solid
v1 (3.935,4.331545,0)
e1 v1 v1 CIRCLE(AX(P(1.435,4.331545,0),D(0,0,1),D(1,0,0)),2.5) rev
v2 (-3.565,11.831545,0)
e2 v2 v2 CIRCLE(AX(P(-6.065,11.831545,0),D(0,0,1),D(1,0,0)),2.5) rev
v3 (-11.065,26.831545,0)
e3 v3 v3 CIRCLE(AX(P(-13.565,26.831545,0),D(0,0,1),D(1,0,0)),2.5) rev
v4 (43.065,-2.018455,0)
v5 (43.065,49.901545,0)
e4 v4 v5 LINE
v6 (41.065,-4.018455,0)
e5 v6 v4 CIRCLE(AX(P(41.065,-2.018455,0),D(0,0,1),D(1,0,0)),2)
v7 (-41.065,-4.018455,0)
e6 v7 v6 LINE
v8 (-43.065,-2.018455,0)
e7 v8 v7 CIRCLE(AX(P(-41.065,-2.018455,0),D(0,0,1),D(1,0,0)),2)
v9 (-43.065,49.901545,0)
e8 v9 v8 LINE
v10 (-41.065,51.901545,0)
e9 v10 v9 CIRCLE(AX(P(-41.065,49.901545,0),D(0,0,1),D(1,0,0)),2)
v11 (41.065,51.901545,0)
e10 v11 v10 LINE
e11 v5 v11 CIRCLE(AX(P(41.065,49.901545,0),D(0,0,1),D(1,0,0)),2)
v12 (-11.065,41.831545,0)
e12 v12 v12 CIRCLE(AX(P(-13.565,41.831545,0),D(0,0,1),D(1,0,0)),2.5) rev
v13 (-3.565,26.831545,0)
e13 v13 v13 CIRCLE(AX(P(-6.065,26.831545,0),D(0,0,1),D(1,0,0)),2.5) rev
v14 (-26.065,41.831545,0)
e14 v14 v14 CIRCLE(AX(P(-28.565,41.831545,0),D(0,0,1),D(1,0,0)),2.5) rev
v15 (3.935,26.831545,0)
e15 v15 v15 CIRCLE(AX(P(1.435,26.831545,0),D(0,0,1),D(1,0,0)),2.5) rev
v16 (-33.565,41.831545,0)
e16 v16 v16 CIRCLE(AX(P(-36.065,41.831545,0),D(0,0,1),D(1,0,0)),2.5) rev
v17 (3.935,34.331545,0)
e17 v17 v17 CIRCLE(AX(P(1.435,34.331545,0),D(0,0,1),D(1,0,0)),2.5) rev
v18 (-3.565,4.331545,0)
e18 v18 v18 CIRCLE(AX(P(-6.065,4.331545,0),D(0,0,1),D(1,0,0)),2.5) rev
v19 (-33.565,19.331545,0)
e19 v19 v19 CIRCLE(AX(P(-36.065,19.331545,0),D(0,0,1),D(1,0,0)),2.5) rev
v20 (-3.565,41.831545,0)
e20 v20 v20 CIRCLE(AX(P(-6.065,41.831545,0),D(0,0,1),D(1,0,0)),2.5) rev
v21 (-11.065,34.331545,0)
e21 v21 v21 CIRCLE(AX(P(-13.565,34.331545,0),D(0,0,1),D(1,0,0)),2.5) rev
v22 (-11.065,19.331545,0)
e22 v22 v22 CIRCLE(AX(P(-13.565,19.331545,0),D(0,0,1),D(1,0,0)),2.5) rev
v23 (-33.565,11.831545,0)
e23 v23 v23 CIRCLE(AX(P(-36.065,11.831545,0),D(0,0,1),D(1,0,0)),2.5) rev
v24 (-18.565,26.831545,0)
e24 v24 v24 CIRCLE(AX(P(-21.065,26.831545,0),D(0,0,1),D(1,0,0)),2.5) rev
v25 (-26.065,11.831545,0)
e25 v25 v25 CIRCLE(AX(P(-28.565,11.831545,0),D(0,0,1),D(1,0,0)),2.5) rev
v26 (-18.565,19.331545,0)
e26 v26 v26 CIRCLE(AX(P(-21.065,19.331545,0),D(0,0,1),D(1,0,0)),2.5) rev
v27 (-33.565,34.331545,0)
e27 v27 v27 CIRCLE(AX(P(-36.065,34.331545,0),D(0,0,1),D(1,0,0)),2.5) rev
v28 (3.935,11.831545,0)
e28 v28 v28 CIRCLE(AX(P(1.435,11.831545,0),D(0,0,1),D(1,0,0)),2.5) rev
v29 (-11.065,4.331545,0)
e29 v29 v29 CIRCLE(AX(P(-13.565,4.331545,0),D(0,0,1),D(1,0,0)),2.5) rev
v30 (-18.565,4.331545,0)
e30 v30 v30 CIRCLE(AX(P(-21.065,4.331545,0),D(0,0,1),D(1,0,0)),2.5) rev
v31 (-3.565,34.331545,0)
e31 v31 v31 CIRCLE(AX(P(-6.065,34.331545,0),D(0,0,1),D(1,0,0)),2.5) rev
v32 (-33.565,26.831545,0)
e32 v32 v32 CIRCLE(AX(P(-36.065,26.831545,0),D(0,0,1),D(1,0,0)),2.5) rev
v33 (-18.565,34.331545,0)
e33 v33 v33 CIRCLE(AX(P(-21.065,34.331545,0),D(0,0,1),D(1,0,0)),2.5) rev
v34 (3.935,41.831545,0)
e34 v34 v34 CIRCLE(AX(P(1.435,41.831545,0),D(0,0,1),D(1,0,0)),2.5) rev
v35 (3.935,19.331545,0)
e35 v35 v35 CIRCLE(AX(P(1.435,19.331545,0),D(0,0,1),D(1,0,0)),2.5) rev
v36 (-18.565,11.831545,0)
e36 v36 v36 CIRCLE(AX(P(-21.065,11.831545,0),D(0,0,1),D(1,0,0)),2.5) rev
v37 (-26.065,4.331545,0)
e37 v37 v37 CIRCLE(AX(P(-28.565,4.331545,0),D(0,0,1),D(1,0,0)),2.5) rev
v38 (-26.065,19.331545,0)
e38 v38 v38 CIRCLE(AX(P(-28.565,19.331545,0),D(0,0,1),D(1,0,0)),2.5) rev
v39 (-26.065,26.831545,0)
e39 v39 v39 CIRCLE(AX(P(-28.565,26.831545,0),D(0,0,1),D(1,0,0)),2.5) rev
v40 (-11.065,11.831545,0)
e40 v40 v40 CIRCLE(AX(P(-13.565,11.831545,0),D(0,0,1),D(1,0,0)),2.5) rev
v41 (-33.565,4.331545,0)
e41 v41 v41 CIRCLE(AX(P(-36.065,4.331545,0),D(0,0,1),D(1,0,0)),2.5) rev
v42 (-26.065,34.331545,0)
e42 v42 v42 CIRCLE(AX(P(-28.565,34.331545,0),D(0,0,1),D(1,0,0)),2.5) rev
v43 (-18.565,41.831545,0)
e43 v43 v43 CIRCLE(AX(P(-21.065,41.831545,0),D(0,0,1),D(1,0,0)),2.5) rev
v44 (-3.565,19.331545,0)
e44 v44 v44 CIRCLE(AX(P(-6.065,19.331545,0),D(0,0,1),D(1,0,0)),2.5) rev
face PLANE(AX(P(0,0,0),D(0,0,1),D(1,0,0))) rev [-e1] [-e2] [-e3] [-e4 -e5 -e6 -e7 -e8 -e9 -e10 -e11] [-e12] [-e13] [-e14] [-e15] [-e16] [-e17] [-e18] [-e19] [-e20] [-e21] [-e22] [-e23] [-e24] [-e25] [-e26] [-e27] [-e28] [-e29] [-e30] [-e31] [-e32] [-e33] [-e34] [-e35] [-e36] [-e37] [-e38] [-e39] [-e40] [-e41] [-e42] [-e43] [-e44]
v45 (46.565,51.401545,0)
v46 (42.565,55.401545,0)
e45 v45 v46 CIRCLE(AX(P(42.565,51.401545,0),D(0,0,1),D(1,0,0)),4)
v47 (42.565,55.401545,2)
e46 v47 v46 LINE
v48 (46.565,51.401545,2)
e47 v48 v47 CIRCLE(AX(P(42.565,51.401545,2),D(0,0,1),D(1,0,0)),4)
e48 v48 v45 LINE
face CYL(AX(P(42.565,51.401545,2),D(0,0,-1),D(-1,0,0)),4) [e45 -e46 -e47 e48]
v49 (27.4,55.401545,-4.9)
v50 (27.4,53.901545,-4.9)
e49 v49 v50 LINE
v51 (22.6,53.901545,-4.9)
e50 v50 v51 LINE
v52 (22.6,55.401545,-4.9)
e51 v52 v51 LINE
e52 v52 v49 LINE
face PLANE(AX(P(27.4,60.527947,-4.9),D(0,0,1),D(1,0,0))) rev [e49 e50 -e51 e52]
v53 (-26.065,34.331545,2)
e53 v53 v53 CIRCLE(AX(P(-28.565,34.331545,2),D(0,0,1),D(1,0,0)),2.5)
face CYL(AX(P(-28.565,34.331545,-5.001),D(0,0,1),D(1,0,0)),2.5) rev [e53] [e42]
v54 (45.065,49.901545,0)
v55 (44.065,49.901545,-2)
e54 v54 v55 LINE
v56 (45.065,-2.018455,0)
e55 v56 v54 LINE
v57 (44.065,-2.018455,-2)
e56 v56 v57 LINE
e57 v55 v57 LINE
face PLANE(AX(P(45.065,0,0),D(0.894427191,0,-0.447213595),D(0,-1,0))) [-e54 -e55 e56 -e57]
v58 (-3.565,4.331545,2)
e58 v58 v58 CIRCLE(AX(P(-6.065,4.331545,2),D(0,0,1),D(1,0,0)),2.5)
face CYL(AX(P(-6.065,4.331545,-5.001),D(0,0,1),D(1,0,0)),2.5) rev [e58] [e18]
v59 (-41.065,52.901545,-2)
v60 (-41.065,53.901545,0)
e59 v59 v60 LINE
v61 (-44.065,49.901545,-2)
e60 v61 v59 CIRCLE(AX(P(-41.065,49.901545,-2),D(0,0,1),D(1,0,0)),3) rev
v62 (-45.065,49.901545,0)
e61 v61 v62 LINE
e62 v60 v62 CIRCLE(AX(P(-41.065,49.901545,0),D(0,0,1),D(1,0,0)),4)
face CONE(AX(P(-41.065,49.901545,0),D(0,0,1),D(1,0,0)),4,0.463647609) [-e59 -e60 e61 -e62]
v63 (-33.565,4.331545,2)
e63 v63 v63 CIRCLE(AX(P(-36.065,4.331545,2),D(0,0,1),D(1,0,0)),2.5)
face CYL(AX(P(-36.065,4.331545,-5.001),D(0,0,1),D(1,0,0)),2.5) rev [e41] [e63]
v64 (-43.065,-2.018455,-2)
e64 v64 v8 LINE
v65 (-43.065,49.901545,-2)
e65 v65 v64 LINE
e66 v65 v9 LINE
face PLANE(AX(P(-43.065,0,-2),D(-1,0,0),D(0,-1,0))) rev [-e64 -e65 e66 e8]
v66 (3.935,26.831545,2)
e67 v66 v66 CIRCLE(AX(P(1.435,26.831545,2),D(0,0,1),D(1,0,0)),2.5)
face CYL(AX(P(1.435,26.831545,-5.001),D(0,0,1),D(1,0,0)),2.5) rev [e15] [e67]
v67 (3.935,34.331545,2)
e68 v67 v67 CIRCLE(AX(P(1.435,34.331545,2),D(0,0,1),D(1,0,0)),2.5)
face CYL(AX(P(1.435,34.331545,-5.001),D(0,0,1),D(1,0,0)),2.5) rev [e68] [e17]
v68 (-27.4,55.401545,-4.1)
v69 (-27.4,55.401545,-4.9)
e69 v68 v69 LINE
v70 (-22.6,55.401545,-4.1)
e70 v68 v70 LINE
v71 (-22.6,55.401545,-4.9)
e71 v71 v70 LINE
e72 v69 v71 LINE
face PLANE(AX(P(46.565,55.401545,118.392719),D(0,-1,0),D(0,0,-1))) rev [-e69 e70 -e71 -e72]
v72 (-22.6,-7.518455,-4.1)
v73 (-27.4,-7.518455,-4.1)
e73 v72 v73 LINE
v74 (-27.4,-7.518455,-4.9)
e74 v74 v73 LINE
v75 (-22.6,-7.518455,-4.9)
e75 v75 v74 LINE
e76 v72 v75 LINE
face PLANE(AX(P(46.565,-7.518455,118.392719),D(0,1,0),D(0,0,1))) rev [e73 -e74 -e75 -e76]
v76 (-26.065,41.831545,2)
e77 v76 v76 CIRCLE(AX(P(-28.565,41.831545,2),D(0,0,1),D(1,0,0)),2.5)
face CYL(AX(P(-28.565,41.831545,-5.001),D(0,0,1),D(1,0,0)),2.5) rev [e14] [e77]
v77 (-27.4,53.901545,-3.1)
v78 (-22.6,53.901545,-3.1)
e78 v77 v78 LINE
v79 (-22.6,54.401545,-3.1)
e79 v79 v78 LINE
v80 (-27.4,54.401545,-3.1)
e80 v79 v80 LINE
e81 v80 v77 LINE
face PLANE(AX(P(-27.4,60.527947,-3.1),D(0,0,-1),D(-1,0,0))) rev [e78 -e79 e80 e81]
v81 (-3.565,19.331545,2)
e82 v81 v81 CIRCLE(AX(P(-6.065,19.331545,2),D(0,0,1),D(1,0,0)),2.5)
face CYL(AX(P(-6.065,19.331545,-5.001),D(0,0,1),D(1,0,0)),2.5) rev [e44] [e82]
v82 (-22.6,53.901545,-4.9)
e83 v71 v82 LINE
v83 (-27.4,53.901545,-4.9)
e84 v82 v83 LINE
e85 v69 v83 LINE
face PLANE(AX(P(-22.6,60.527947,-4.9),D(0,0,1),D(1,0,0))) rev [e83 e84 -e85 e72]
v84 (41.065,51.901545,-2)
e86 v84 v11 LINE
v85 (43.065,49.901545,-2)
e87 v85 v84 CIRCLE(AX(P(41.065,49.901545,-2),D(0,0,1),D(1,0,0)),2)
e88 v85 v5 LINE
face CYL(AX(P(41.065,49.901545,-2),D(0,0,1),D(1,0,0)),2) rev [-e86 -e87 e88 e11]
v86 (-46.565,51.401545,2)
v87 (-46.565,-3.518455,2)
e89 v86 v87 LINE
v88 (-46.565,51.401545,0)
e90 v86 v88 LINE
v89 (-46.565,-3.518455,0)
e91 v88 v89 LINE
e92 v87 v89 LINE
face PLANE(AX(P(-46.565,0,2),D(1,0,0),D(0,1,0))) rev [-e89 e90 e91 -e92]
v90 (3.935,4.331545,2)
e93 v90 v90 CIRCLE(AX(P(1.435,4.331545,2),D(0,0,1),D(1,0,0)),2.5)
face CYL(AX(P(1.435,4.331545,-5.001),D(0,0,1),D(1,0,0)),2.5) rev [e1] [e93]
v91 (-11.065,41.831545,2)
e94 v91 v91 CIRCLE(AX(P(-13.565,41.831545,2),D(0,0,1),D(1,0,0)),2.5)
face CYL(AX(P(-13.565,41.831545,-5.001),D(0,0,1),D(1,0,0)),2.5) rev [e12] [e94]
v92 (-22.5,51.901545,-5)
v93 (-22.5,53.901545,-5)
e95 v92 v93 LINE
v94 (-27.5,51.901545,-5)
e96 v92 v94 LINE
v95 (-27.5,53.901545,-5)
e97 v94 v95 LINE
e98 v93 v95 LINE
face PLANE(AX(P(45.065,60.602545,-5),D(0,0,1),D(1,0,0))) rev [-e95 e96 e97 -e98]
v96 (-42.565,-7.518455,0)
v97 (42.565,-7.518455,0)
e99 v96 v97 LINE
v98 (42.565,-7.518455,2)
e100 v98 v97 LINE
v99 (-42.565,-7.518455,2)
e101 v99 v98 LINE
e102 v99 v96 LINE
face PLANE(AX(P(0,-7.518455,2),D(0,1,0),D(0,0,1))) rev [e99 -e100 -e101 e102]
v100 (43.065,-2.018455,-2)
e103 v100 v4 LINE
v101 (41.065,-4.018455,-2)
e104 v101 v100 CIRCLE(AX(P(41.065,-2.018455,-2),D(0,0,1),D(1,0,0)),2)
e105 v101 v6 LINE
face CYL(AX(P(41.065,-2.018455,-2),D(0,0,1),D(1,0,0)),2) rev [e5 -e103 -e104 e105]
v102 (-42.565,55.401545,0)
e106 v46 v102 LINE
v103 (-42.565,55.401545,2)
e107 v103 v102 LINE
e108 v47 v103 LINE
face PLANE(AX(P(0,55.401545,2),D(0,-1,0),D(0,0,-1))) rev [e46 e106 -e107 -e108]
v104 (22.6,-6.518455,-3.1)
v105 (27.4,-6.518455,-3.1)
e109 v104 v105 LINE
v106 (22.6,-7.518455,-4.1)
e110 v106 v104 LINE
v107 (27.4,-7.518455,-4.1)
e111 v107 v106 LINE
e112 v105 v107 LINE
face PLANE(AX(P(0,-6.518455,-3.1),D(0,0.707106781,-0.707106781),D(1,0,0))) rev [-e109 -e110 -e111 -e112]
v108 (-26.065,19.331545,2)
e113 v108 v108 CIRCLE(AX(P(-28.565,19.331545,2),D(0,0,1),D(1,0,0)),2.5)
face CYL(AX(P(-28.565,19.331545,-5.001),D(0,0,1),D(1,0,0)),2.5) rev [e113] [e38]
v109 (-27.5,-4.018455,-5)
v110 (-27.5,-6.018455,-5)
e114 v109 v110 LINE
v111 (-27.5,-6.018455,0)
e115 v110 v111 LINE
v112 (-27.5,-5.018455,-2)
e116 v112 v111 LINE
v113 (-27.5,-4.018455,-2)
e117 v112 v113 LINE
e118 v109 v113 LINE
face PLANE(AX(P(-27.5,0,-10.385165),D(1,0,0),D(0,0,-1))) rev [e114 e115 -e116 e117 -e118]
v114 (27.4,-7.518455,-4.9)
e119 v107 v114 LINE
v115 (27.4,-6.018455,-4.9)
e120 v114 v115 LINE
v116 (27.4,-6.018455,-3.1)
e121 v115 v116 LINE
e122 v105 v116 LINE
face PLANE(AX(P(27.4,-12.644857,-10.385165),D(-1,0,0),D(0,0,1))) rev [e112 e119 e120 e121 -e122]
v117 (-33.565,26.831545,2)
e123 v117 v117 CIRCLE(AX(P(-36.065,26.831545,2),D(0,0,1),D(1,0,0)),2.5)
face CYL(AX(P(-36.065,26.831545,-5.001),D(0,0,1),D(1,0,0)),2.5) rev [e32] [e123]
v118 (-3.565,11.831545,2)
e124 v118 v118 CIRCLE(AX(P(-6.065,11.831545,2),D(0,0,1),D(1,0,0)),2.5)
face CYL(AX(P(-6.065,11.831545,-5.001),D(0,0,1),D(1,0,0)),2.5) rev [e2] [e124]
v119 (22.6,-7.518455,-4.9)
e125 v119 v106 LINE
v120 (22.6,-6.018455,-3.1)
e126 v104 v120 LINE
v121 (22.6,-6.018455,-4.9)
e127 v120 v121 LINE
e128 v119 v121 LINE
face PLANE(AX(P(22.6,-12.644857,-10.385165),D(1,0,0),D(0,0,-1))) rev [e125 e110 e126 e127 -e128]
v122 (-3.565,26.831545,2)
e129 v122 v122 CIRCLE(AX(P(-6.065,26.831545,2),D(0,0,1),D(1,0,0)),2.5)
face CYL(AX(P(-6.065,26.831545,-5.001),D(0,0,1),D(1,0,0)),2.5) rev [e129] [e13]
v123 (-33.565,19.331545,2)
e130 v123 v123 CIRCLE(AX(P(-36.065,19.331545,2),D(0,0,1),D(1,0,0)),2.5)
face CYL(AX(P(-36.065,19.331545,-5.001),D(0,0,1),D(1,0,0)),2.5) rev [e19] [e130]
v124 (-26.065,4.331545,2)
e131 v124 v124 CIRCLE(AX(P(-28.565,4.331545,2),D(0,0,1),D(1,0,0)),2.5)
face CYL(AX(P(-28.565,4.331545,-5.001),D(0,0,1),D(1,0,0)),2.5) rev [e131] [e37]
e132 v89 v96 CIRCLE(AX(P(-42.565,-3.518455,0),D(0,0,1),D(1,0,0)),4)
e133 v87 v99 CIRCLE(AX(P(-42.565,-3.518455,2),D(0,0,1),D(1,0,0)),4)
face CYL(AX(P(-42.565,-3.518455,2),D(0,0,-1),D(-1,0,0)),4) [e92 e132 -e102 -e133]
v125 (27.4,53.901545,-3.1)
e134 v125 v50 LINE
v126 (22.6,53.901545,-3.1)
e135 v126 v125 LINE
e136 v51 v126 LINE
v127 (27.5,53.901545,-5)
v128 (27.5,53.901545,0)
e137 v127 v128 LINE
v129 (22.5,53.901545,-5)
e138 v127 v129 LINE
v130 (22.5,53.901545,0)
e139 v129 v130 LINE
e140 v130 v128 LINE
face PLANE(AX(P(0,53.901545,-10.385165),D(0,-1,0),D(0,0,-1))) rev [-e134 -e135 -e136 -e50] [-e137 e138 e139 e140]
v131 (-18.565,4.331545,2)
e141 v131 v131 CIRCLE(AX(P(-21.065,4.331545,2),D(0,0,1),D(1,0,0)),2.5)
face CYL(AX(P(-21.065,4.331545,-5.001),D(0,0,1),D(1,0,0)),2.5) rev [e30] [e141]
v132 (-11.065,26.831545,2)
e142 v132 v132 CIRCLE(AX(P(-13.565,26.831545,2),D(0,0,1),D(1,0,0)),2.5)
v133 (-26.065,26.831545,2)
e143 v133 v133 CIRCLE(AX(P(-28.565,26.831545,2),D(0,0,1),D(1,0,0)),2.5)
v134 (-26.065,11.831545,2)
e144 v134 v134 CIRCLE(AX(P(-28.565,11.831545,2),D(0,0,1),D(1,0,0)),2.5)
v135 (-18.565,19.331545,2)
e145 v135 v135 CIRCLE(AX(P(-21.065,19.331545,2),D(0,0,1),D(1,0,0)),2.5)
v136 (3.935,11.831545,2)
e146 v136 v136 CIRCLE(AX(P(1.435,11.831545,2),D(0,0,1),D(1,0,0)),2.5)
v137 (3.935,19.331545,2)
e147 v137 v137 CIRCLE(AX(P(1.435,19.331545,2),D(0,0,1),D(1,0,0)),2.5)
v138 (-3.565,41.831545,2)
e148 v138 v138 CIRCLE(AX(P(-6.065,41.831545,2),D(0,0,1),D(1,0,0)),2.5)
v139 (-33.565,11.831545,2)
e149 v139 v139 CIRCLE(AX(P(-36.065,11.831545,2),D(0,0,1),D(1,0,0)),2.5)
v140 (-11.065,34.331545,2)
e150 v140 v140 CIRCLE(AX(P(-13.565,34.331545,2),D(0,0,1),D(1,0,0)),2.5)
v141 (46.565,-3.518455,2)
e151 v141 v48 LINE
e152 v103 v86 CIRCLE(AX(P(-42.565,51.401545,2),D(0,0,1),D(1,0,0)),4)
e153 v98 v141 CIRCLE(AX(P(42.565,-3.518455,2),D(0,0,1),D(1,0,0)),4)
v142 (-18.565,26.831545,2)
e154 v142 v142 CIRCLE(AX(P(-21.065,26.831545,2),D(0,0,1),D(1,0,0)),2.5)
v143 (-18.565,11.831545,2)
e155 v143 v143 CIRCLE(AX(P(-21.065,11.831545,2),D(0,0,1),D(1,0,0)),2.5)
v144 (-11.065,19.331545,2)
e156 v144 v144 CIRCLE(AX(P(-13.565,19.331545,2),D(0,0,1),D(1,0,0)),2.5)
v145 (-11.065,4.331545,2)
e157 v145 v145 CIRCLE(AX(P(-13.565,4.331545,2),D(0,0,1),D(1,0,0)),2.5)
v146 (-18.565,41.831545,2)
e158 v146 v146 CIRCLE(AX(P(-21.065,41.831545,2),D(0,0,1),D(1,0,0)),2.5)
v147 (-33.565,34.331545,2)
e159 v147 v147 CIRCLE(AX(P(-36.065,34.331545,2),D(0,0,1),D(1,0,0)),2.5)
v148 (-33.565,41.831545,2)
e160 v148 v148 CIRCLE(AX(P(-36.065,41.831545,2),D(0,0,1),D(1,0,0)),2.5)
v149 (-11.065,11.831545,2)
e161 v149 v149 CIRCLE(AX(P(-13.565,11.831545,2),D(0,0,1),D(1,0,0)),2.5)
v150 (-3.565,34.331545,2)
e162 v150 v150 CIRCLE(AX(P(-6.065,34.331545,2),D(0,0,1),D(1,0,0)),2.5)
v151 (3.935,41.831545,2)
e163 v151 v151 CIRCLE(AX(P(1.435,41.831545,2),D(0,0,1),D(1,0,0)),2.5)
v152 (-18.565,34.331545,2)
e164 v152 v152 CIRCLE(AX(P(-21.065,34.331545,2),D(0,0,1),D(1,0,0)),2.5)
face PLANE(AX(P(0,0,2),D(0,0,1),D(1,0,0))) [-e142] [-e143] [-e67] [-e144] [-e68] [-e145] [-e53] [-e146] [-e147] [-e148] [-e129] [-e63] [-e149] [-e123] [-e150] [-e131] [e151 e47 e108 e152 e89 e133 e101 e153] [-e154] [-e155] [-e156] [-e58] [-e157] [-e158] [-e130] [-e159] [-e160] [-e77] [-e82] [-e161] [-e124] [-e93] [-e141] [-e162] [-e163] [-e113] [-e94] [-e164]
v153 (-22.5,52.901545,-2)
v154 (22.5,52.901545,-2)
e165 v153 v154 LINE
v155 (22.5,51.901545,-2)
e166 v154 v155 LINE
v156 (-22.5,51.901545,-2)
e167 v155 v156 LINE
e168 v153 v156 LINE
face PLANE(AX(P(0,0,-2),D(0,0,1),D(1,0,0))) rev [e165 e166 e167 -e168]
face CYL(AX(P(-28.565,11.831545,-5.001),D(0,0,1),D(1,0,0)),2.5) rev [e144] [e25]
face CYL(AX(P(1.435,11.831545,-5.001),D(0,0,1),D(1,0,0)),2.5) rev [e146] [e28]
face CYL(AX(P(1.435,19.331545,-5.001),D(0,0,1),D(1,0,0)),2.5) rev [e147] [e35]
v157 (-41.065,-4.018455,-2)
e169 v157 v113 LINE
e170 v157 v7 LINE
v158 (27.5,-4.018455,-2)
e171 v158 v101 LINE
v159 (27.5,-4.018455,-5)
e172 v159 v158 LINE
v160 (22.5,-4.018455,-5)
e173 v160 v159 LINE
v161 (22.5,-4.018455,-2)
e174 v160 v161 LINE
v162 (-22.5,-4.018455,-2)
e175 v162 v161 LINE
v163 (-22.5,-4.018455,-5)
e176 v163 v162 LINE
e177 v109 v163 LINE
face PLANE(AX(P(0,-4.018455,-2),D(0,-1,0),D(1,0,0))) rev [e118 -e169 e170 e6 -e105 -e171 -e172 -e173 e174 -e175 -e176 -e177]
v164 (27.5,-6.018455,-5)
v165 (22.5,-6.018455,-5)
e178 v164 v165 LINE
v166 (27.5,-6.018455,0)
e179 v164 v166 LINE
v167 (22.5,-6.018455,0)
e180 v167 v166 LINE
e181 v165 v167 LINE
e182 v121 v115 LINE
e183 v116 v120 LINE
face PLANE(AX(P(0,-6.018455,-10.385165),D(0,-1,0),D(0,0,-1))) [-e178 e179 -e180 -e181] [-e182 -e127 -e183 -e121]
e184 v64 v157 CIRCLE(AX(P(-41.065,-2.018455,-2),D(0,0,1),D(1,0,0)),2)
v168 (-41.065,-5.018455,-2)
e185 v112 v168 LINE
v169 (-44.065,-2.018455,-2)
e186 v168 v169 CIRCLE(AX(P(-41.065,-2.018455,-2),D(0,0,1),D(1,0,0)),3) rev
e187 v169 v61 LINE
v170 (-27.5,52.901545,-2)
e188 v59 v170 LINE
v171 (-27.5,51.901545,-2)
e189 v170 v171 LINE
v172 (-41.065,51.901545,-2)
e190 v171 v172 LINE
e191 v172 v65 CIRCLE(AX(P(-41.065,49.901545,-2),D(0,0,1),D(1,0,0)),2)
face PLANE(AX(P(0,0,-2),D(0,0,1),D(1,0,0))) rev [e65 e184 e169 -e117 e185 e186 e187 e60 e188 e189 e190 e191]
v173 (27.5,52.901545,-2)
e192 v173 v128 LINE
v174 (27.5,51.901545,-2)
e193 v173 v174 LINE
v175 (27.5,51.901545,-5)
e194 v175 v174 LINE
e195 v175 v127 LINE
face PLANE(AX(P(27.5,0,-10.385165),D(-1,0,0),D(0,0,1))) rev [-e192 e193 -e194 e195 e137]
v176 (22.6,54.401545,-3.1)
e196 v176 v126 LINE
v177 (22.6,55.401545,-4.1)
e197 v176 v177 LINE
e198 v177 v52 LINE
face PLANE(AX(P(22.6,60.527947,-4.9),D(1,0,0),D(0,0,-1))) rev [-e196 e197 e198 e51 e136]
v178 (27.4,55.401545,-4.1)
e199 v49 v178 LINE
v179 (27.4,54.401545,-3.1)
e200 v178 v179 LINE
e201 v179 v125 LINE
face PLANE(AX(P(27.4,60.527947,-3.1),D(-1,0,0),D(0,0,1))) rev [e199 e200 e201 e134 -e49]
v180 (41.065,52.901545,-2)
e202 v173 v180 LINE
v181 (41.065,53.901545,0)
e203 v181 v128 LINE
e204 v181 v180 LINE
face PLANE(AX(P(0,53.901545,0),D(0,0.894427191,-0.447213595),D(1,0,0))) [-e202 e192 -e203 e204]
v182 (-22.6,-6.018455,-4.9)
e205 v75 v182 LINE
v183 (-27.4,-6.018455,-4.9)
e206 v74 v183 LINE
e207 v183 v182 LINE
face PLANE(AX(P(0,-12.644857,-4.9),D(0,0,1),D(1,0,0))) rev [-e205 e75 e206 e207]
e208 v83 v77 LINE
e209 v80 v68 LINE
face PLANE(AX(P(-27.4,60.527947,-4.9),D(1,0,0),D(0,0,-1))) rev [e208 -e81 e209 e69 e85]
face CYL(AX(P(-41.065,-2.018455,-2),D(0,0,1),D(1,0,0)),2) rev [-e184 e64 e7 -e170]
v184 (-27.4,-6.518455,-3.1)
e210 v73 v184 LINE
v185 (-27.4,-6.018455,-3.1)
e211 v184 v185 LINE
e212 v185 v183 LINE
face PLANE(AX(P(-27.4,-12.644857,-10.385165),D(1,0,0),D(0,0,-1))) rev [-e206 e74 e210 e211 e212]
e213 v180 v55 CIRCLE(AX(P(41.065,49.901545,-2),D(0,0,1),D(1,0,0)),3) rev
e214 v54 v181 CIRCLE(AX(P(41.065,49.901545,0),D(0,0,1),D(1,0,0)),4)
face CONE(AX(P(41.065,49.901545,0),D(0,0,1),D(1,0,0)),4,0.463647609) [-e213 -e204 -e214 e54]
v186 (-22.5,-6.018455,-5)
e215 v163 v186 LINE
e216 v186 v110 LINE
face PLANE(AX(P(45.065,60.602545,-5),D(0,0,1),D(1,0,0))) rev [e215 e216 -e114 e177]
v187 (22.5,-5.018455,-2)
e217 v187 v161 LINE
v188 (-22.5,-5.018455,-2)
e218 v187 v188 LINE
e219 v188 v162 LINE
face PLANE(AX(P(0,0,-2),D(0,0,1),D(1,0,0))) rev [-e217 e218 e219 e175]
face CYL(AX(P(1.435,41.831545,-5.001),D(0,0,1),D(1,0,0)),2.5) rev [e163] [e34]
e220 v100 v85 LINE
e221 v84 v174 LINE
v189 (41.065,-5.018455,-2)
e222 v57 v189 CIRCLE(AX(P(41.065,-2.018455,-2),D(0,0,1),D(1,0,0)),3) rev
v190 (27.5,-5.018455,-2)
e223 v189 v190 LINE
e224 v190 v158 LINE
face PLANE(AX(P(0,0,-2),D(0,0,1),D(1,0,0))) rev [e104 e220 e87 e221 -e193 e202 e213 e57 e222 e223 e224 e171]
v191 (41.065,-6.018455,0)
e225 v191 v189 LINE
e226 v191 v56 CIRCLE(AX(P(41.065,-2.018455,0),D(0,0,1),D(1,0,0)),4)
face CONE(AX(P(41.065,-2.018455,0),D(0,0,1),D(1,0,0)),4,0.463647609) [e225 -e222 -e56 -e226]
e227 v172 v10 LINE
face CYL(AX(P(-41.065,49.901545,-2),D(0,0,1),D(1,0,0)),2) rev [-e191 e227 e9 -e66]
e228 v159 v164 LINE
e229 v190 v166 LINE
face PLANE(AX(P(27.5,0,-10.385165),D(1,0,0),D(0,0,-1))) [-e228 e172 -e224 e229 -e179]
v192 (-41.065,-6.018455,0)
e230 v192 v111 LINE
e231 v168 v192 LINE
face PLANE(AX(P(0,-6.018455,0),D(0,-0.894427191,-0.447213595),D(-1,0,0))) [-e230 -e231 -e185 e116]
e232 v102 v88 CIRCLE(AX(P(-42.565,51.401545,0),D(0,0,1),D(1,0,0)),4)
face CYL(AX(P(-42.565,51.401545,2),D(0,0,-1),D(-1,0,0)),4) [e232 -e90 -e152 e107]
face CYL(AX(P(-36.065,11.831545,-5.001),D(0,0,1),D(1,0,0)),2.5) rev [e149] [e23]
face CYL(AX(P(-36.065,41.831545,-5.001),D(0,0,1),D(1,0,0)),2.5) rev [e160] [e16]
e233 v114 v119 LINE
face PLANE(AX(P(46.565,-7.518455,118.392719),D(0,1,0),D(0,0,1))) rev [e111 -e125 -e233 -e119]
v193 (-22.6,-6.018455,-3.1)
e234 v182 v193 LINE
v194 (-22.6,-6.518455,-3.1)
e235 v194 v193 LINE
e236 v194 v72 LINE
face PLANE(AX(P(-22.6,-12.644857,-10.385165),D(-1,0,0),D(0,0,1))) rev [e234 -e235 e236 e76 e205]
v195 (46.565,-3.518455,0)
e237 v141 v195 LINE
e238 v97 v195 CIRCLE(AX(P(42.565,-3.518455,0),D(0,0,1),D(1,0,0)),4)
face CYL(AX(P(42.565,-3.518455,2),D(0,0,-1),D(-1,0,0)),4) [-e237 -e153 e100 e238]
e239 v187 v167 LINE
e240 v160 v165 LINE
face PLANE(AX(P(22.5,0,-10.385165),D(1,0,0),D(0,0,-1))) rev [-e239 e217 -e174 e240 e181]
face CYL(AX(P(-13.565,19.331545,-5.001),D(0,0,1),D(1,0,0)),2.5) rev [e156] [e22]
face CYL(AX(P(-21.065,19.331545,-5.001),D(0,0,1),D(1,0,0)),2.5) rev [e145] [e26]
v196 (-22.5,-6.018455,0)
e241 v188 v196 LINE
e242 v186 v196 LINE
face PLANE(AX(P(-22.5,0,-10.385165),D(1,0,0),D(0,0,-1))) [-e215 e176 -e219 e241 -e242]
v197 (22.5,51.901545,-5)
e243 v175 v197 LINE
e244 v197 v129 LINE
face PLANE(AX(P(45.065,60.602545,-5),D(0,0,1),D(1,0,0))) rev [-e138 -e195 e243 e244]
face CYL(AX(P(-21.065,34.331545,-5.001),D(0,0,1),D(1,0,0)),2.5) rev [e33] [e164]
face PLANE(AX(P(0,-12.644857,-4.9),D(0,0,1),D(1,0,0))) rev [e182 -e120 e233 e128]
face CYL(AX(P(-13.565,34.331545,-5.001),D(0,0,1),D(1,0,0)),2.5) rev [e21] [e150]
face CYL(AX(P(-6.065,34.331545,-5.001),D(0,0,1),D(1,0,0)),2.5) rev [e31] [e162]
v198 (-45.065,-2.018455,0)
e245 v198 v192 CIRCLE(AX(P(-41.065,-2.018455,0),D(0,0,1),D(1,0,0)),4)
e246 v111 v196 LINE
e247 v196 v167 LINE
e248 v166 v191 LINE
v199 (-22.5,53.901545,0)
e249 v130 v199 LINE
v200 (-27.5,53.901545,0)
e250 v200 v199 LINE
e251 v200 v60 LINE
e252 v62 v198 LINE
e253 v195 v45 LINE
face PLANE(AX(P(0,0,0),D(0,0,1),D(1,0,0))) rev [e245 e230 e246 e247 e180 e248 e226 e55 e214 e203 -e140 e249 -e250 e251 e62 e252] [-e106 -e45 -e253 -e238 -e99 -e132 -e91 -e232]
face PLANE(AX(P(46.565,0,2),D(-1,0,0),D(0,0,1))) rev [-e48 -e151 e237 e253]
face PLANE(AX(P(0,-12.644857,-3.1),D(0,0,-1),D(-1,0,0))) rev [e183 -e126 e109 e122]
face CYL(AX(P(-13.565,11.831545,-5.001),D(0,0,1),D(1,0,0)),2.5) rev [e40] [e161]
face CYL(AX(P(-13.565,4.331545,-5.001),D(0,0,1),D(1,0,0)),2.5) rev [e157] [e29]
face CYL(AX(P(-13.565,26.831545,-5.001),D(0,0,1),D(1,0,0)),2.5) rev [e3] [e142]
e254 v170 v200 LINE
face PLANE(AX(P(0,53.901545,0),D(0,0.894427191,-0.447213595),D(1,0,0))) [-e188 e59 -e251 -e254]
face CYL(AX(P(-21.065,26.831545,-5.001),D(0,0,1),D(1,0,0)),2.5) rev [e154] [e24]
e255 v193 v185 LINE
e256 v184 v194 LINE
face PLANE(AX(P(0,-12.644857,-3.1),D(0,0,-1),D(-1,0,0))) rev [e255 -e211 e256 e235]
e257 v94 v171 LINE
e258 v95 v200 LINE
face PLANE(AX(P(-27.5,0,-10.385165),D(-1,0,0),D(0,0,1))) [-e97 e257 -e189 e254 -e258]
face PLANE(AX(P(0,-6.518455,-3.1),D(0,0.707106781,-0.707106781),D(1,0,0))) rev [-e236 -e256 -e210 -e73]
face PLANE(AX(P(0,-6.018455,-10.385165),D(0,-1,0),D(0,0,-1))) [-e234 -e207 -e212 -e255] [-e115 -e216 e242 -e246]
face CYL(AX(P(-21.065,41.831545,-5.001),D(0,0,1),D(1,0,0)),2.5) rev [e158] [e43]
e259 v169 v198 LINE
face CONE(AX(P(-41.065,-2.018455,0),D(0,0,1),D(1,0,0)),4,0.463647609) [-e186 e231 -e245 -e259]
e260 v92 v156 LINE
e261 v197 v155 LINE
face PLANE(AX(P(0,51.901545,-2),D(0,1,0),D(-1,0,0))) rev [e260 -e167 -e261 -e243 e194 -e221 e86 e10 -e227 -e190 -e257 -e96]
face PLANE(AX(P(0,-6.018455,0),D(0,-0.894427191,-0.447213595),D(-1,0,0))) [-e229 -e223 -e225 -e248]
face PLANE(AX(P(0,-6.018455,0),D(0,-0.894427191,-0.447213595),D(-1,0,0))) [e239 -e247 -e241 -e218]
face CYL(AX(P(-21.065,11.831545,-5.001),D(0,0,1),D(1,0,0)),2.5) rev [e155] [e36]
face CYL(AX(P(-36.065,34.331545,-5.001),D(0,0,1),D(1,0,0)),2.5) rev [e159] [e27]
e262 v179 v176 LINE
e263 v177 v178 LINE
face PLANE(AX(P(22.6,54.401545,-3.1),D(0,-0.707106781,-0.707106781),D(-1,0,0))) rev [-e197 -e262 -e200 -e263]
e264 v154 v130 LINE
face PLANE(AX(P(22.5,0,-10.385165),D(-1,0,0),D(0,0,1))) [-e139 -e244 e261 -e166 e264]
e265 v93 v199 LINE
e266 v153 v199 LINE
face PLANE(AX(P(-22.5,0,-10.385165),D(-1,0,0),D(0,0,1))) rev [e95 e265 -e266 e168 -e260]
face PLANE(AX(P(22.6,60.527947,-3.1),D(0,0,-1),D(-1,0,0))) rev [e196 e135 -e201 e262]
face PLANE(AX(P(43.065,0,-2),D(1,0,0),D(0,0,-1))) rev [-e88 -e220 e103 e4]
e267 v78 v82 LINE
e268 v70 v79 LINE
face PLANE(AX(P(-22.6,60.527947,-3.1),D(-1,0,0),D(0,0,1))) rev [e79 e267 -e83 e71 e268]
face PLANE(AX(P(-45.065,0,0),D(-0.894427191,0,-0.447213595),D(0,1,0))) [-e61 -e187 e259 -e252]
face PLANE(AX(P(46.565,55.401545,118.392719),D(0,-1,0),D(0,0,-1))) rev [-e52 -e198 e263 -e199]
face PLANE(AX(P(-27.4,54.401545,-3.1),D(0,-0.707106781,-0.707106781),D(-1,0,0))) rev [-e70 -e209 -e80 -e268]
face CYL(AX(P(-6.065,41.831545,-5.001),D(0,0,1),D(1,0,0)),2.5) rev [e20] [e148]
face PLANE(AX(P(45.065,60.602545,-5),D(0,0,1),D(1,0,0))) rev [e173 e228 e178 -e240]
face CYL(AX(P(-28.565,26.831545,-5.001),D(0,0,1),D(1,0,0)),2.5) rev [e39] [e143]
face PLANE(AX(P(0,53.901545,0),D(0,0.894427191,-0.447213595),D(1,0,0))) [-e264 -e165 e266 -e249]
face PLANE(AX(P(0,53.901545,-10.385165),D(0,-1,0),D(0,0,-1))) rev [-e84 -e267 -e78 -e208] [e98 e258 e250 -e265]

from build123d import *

# Parameters (mm, degrees)
BOSS_EXTRUDE2_DEPTH = 2
BOSS_EXTRUDE3_DEPTH = 2
CHAMFER1_SIZE       = 2
CHAMFER1_SIZE_2     = 1
SKETCH3_W           = 5
SKETCH3_H           = 2
BOSS_EXTRUDE4_DEPTH = 5
SKETCH4_W           = 4.8
SKETCH4_H           = 1.8
BOSS_EXTRUDE5_DEPTH = 1.5
BOSS_EXTRUDE6_START = -59.92
SKETCH4_2_W         = 4.8
SKETCH4_2_H         = 1.8
BOSS_EXTRUDE6_DEPTH = 1.5
CHAMFER2_SIZE       = 1
SKETCH5_R           = 2.5
CUT_EXTRUDE1_DEPTH  = 2


with BuildPart() as part:
    # Sketch2 → Boss-Extrude2 (new body)
    # profile 1 of 3: a face of its own
    with BuildSketch(Plane.XY):
        with BuildLine():
            Line((-18.805, 55.401544778), (-42.565, 55.401544778))
            ThreePointArc((-42.565, 55.401544778), (-45.393427125, 54.229971902), (-46.565, 51.401544778))
            Line((-46.565, 51.401544778), (-46.565, -3.518455222))
            ThreePointArc((-46.565, -3.518455222), (-45.393427125, -6.346882347), (-42.565, -7.518455222))
            Line((-42.565, -7.518455222), (42.565, -7.518455222))
            ThreePointArc((42.565, -7.518455222), (45.393427125, -6.346882347), (46.565, -3.518455222))
            Line((46.565, -3.518455222), (46.565, 51.401544778))
            ThreePointArc((46.565, 51.401544778), (45.393427125, 54.229971902), (42.565, 55.401544778))
            Line((42.565, 55.401544778), (2.595, 55.401544778))
            Line((2.595, 55.401544778), (1.595, 55.401544778))
            Line((1.595, 55.401544778), (-17.805, 55.401544778))
            Line((-17.805, 55.401544778), (-18.805, 55.401544778))
        make_face()
        with BuildLine():
            ThreePointArc((-41.065, 53.901544778), (-43.893427125, 52.729971902), (-45.065, 49.901544778))
            Line((-45.065, 49.901544778), (-45.065, -2.018455222))
            ThreePointArc((-45.065, -2.018455222), (-43.893427125, -4.846882347), (-41.065, -6.018455222))
            Line((-41.065, -6.018455222), (41.065, -6.018455222))
            ThreePointArc((41.065, -6.018455222), (43.893427125, -4.846882347), (45.065, -2.018455222))
            Line((45.065, -2.018455222), (45.065, 49.901544778))
            ThreePointArc((45.065, 49.901544778), (43.893427125, 52.729971902), (41.065, 53.901544778))
            Line((41.065, 53.901544778), (-41.065, 53.901544778))
        make_face(mode=Mode.SUBTRACT)
    # profile 2 of 3: a face of its own
    with BuildSketch(Plane.XY):
        with BuildLine():
            Line((41.065, 53.901544778), (-41.065, 53.901544778))
            ThreePointArc((-41.065, 53.901544778), (-43.893427125, 52.729971902), (-45.065, 49.901544778))
            Line((-45.065, 49.901544778), (-45.065, -2.018455222))
            ThreePointArc((-45.065, -2.018455222), (-43.893427125, -4.846882347), (-41.065, -6.018455222))
            Line((-41.065, -6.018455222), (41.065, -6.018455222))
            ThreePointArc((41.065, -6.018455222), (43.893427125, -4.846882347), (45.065, -2.018455222))
            Line((45.065, -2.018455222), (45.065, 49.901544778))
            ThreePointArc((45.065, 49.901544778), (43.893427125, 52.729971902), (41.065, 53.901544778))
        make_face()
        with BuildLine():
            ThreePointArc((41.065, -4.018455222), (42.479213562, -3.432668785), (43.065, -2.018455222))
            Line((43.065, -2.018455222), (43.065, 49.901544778))
            ThreePointArc((43.065, 49.901544778), (42.479213562, 51.31575834), (41.065, 51.901544778))
            Line((41.065, 51.901544778), (-41.065, 51.901544778))
            ThreePointArc((-41.065, 51.901544778), (-42.479213562, 51.31575834), (-43.065, 49.901544778))
            Line((-43.065, 49.901544778), (-43.065, -2.018455222))
            ThreePointArc((-43.065, -2.018455222), (-42.479213562, -3.432668785), (-41.065, -4.018455222))
            Line((-41.065, -4.018455222), (41.065, -4.018455222))
        make_face(mode=Mode.SUBTRACT)
    # profile 3 of 3: a face of its own
    with BuildSketch(Plane.XY):
        with BuildLine():
            Line((-41.065, -4.018455222), (41.065, -4.018455222))
            ThreePointArc((41.065, -4.018455222), (42.479213562, -3.432668785), (43.065, -2.018455222))
            Line((43.065, -2.018455222), (43.065, 49.901544778))
            ThreePointArc((43.065, 49.901544778), (42.479213562, 51.31575834), (41.065, 51.901544778))
            Line((41.065, 51.901544778), (-41.065, 51.901544778))
            ThreePointArc((-41.065, 51.901544778), (-42.479213562, 51.31575834), (-43.065, 49.901544778))
            Line((-43.065, 49.901544778), (-43.065, -2.018455222))
            ThreePointArc((-43.065, -2.018455222), (-42.479213562, -3.432668785), (-41.065, -4.018455222))
        make_face()
    extrude(amount=BOSS_EXTRUDE2_DEPTH)

    # Sketch2<3> → Boss-Extrude3 (add)
    with BuildSketch(Plane.XY):
        with BuildLine():
            Line((41.065, 53.901544778), (-41.065, 53.901544778))
            ThreePointArc((-41.065, 53.901544778), (-43.893427125, 52.729971902), (-45.065, 49.901544778))
            Line((-45.065, 49.901544778), (-45.065, -2.018455222))
            ThreePointArc((-45.065, -2.018455222), (-43.893427125, -4.846882347), (-41.065, -6.018455222))
            Line((-41.065, -6.018455222), (41.065, -6.018455222))
            ThreePointArc((41.065, -6.018455222), (43.893427125, -4.846882347), (45.065, -2.018455222))
            Line((45.065, -2.018455222), (45.065, 49.901544778))
            ThreePointArc((45.065, 49.901544778), (43.893427125, 52.729971902), (41.065, 53.901544778))
        make_face()
        with BuildLine():
            ThreePointArc((41.065, -4.018455222), (42.479213562, -3.432668785), (43.065, -2.018455222))
            Line((43.065, -2.018455222), (43.065, 49.901544778))
            ThreePointArc((43.065, 49.901544778), (42.479213562, 51.31575834), (41.065, 51.901544778))
            Line((41.065, 51.901544778), (-41.065, 51.901544778))
            ThreePointArc((-41.065, 51.901544778), (-42.479213562, 51.31575834), (-43.065, 49.901544778))
            Line((-43.065, 49.901544778), (-43.065, -2.018455222))
            ThreePointArc((-43.065, -2.018455222), (-42.479213562, -3.432668785), (-41.065, -4.018455222))
            Line((-41.065, -4.018455222), (41.065, -4.018455222))
        make_face(mode=Mode.SUBTRACT)
    extrude(amount=-BOSS_EXTRUDE3_DEPTH)

    # Chamfer1
    # the kernel refuses this chamfer: 2, 1 mm, written as the material it takes off along each edge
    with BuildSketch(Plane(origin=(41.065, 53.901544778, -2), x_dir=(0, 0.017268075123669586, 0.9998508956747119), z_dir=(-1, 0, 0))) as chamfer1_piece_1_section:
        Polygon((CHAMFER1_SIZE * 0.999850895675, -CHAMFER1_SIZE * 0.0172680751237), (-CHAMFER1_SIZE_2 * 0.0172680751237, -CHAMFER1_SIZE_2 * 0.999850895675), (0, 0), align=None)
    chamfer1_piece_1 = extrude(amount=82.13, mode=Mode.PRIVATE)
    chamfer1_piece_1 = split(chamfer1_piece_1, bisect_by=Plane(origin=(0, 53.583058293, 0), z_dir=(0, 0, -1)), keep=Keep.TOP, mode=Mode.PRIVATE)
    add(chamfer1_piece_1, mode=Mode.SUBTRACT)
    with BuildSketch(Plane(origin=(-41.065, 49.901544778, -2), x_dir=(0, 1, 0), z_dir=(1, 0, 0))) as chamfer1_piece_2_section:
        Polygon((4, CHAMFER1_SIZE), (4 - CHAMFER1_SIZE_2, 0), (4, 0), align=None)
    chamfer1_piece_2 = revolve(axis=Axis((-41.065, 49.901544778, -2), (0, 0, 1)), revolution_arc=90, mode=Mode.PRIVATE)
    chamfer1_piece_2 = split(chamfer1_piece_2, bisect_by=Plane(origin=(-43.539094685, 52.375639463, 0), z_dir=(0, 0, -1)), keep=Keep.TOP, mode=Mode.PRIVATE)
    add(chamfer1_piece_2, mode=Mode.SUBTRACT)
    with BuildSketch(Plane(origin=(41.065, 49.901544778, -2), x_dir=(1, 0, 0), z_dir=(0, -1, 0))) as chamfer1_piece_3_section:
        Polygon((4, CHAMFER1_SIZE), (4 - CHAMFER1_SIZE_2, 0), (4, 0), align=None)
    chamfer1_piece_3 = revolve(axis=Axis((41.065, 49.901544778, -2), (0, 0, 1)), revolution_arc=90, mode=Mode.PRIVATE)
    chamfer1_piece_3 = split(chamfer1_piece_3, bisect_by=Plane(origin=(43.539094685, 52.375639463, 0), z_dir=(0, 0, -1)), keep=Keep.TOP, mode=Mode.PRIVATE)
    add(chamfer1_piece_3, mode=Mode.SUBTRACT)
    with BuildSketch(Plane(origin=(-45.065, 49.901544778, -2), x_dir=(-0.017268075123669586, 0, 0.9998508956747119), z_dir=(0, -1, 0))) as chamfer1_piece_4_section:
        Polygon((CHAMFER1_SIZE * 0.999850895675, -CHAMFER1_SIZE * 0.0172680751237), (-CHAMFER1_SIZE_2 * 0.0172680751237, -CHAMFER1_SIZE_2 * 0.999850895675), (0, 0), align=None)
    chamfer1_piece_4 = extrude(amount=51.92, mode=Mode.PRIVATE)
    chamfer1_piece_4 = split(chamfer1_piece_4, bisect_by=Plane(origin=(-44.746513515, 23.941544778, 0), z_dir=(0, 0, -1)), keep=Keep.TOP, mode=Mode.PRIVATE)
    add(chamfer1_piece_4, mode=Mode.SUBTRACT)
    with BuildSketch(Plane(origin=(45.065, -2.018455222, -2), x_dir=(0.017268075123669586, 0, 0.9998508956747119), z_dir=(0, 1, 0))) as chamfer1_piece_5_section:
        Polygon((CHAMFER1_SIZE * 0.999850895675, -CHAMFER1_SIZE * 0.0172680751237), (-CHAMFER1_SIZE_2 * 0.0172680751237, -CHAMFER1_SIZE_2 * 0.999850895675), (0, 0), align=None)
    chamfer1_piece_5 = extrude(amount=51.92, mode=Mode.PRIVATE)
    chamfer1_piece_5 = split(chamfer1_piece_5, bisect_by=Plane(origin=(44.746513515, 23.941544778, 0), z_dir=(0, 0, -1)), keep=Keep.TOP, mode=Mode.PRIVATE)
    add(chamfer1_piece_5, mode=Mode.SUBTRACT)
    with BuildSketch(Plane(origin=(-41.065, -2.018455222, -2), x_dir=(-1, 0, 0), z_dir=(0, 1, 0))) as chamfer1_piece_6_section:
        Polygon((4, CHAMFER1_SIZE), (4 - CHAMFER1_SIZE_2, 0), (4, 0), align=None)
    chamfer1_piece_6 = revolve(axis=Axis((-41.065, -2.018455222, -2), (0, 0, 1)), revolution_arc=90, mode=Mode.PRIVATE)
    chamfer1_piece_6 = split(chamfer1_piece_6, bisect_by=Plane(origin=(-43.539094685, -4.492549907, 0), z_dir=(0, 0, -1)), keep=Keep.TOP, mode=Mode.PRIVATE)
    add(chamfer1_piece_6, mode=Mode.SUBTRACT)
    with BuildSketch(Plane(origin=(41.065, -2.018455222, -2), x_dir=(0, -1, 0), z_dir=(-1, 0, 0))) as chamfer1_piece_7_section:
        Polygon((4, CHAMFER1_SIZE), (4 - CHAMFER1_SIZE_2, 0), (4, 0), align=None)
    chamfer1_piece_7 = revolve(axis=Axis((41.065, -2.018455222, -2), (0, 0, 1)), revolution_arc=90, mode=Mode.PRIVATE)
    chamfer1_piece_7 = split(chamfer1_piece_7, bisect_by=Plane(origin=(43.539094685, -4.492549907, 0), z_dir=(0, 0, -1)), keep=Keep.TOP, mode=Mode.PRIVATE)
    add(chamfer1_piece_7, mode=Mode.SUBTRACT)
    with BuildSketch(Plane(origin=(-41.065, -6.018455222, -2), x_dir=(0, -0.0172680751236683, 0.9998508956747119), z_dir=(1, 0, 0))) as chamfer1_piece_8_section:
        Polygon((CHAMFER1_SIZE * 0.999850895675, -CHAMFER1_SIZE * 0.0172680751237), (-CHAMFER1_SIZE_2 * 0.0172680751237, -CHAMFER1_SIZE_2 * 0.999850895675), (0, 0), align=None)
    chamfer1_piece_8 = extrude(amount=82.13, mode=Mode.PRIVATE)
    chamfer1_piece_8 = split(chamfer1_piece_8, bisect_by=Plane(origin=(0, -5.699968737, 0), z_dir=(0, 0, -1)), keep=Keep.TOP, mode=Mode.PRIVATE)
    add(chamfer1_piece_8, mode=Mode.SUBTRACT)

    # Sketch3 → Boss-Extrude4 (add)
    with BuildSketch(Plane(origin=(0, 0, 0), x_dir=(-1, 0, 0), z_dir=(0, 0, -1))):
        with Locations((25, 52.901544778)):
            Rectangle(SKETCH3_W, SKETCH3_H)
        with Locations((25, -5.018455222)):
            Rectangle(SKETCH3_W, SKETCH3_H)
        with Locations((-25, -5.018455222)):
            Rectangle(SKETCH3_W, SKETCH3_H)
        with Locations((-25, 52.901544778)):
            Rectangle(SKETCH3_W, SKETCH3_H)
    extrude(amount=BOSS_EXTRUDE4_DEPTH)

    # Sketch4 → Boss-Extrude5 (add)
    with BuildSketch(Plane(origin=(0, 53.901544778, 0), x_dir=(1, 0, 0), z_dir=(0, 1, 0))):
        with Locations((25, 4)):
            Rectangle(SKETCH4_W, SKETCH4_H)
        with Locations((-25, 4)):
            Rectangle(SKETCH4_W, SKETCH4_H)
    extrude(amount=BOSS_EXTRUDE5_DEPTH)

    # Sketch4<2> → Boss-Extrude6 (add)
    with BuildSketch(Plane(origin=(0, 53.901544778, 0), x_dir=(1, 0, 0), z_dir=(0, 1, 0)).offset(BOSS_EXTRUDE6_START)):
        with Locations((25, 4)):
            Rectangle(SKETCH4_2_W, SKETCH4_2_H)
        with Locations((-25, 4)):
            Rectangle(SKETCH4_2_W, SKETCH4_2_H)
    extrude(amount=-BOSS_EXTRUDE6_DEPTH)

    # Chamfer2
    chamfer2_edges = [part.edges().sort_by_distance(p)[0] for p in [
        (-25, 55.401544778, -3.1),
        (25, 55.401544778, -3.1),
        (-25, -7.518455222, -3.1),
        (25, -7.518455222, -3.1),
    ]]
    chamfer(chamfer2_edges, length=CHAMFER2_SIZE)

    # Sketch5 → Cut-Extrude1 (cut)
    with BuildSketch(Plane.XY.offset(2)):
        with Locations((1.435, 41.831544778)):
            Circle(SKETCH5_R)
        with Locations((-6.065, 41.831544778)):
            Circle(SKETCH5_R)
        with Locations((-13.565, 41.831544778)):
            Circle(SKETCH5_R)
        with Locations((-21.065, 41.831544778)):
            Circle(SKETCH5_R)
        with Locations((-28.565, 41.831544778)):
            Circle(SKETCH5_R)
        with Locations((-36.065, 41.831544778)):
            Circle(SKETCH5_R)
        with Locations((-36.065, 34.331544778)):
            Circle(SKETCH5_R)
        with Locations((-28.565, 34.331544778)):
            Circle(SKETCH5_R)
        with Locations((-21.065, 34.331544778)):
            Circle(SKETCH5_R)
        with Locations((-13.565, 34.331544778)):
            Circle(SKETCH5_R)
        with Locations((-6.065, 34.331544778)):
            Circle(SKETCH5_R)
        with Locations((1.435, 34.331544778)):
            Circle(SKETCH5_R)
        with Locations((1.435, 26.831544778)):
            Circle(SKETCH5_R)
        with Locations((-6.065, 26.831544778)):
            Circle(SKETCH5_R)
        with Locations((-13.565, 26.831544778)):
            Circle(SKETCH5_R)
        with Locations((-21.065, 26.831544778)):
            Circle(SKETCH5_R)
        with Locations((-28.565, 26.831544778)):
            Circle(SKETCH5_R)
        with Locations((-36.065, 26.831544778)):
            Circle(SKETCH5_R)
        with Locations((-36.065, 19.331544778)):
            Circle(SKETCH5_R)
        with Locations((-28.565, 19.331544778)):
            Circle(SKETCH5_R)
        with Locations((-21.065, 19.331544778)):
            Circle(SKETCH5_R)
        with Locations((-13.565, 19.331544778)):
            Circle(SKETCH5_R)
        with Locations((-6.065, 19.331544778)):
            Circle(SKETCH5_R)
        with Locations((1.435, 19.331544778)):
            Circle(SKETCH5_R)
        with Locations((1.435, 11.831544778)):
            Circle(SKETCH5_R)
        with Locations((-6.065, 11.831544778)):
            Circle(SKETCH5_R)
        with Locations((-13.565, 11.831544778)):
            Circle(SKETCH5_R)
        with Locations((-21.065, 11.831544778)):
            Circle(SKETCH5_R)
        with Locations((-28.565, 11.831544778)):
            Circle(SKETCH5_R)
        with Locations((-36.065, 11.831544778)):
            Circle(SKETCH5_R)
        with Locations((-36.065, 4.331544778)):
            Circle(SKETCH5_R)
        with Locations((-28.565, 4.331544778)):
            Circle(SKETCH5_R)
        with Locations((-21.065, 4.331544778)):
            Circle(SKETCH5_R)
        with Locations((-13.565, 4.331544778)):
            Circle(SKETCH5_R)
        with Locations((-6.065, 4.331544778)):
            Circle(SKETCH5_R)
        with Locations((1.435, 4.331544778)):
            Circle(SKETCH5_R)
    extrude(amount=-CUT_EXTRUDE1_DEPTH, mode=Mode.SUBTRACT)


solid = part.part
